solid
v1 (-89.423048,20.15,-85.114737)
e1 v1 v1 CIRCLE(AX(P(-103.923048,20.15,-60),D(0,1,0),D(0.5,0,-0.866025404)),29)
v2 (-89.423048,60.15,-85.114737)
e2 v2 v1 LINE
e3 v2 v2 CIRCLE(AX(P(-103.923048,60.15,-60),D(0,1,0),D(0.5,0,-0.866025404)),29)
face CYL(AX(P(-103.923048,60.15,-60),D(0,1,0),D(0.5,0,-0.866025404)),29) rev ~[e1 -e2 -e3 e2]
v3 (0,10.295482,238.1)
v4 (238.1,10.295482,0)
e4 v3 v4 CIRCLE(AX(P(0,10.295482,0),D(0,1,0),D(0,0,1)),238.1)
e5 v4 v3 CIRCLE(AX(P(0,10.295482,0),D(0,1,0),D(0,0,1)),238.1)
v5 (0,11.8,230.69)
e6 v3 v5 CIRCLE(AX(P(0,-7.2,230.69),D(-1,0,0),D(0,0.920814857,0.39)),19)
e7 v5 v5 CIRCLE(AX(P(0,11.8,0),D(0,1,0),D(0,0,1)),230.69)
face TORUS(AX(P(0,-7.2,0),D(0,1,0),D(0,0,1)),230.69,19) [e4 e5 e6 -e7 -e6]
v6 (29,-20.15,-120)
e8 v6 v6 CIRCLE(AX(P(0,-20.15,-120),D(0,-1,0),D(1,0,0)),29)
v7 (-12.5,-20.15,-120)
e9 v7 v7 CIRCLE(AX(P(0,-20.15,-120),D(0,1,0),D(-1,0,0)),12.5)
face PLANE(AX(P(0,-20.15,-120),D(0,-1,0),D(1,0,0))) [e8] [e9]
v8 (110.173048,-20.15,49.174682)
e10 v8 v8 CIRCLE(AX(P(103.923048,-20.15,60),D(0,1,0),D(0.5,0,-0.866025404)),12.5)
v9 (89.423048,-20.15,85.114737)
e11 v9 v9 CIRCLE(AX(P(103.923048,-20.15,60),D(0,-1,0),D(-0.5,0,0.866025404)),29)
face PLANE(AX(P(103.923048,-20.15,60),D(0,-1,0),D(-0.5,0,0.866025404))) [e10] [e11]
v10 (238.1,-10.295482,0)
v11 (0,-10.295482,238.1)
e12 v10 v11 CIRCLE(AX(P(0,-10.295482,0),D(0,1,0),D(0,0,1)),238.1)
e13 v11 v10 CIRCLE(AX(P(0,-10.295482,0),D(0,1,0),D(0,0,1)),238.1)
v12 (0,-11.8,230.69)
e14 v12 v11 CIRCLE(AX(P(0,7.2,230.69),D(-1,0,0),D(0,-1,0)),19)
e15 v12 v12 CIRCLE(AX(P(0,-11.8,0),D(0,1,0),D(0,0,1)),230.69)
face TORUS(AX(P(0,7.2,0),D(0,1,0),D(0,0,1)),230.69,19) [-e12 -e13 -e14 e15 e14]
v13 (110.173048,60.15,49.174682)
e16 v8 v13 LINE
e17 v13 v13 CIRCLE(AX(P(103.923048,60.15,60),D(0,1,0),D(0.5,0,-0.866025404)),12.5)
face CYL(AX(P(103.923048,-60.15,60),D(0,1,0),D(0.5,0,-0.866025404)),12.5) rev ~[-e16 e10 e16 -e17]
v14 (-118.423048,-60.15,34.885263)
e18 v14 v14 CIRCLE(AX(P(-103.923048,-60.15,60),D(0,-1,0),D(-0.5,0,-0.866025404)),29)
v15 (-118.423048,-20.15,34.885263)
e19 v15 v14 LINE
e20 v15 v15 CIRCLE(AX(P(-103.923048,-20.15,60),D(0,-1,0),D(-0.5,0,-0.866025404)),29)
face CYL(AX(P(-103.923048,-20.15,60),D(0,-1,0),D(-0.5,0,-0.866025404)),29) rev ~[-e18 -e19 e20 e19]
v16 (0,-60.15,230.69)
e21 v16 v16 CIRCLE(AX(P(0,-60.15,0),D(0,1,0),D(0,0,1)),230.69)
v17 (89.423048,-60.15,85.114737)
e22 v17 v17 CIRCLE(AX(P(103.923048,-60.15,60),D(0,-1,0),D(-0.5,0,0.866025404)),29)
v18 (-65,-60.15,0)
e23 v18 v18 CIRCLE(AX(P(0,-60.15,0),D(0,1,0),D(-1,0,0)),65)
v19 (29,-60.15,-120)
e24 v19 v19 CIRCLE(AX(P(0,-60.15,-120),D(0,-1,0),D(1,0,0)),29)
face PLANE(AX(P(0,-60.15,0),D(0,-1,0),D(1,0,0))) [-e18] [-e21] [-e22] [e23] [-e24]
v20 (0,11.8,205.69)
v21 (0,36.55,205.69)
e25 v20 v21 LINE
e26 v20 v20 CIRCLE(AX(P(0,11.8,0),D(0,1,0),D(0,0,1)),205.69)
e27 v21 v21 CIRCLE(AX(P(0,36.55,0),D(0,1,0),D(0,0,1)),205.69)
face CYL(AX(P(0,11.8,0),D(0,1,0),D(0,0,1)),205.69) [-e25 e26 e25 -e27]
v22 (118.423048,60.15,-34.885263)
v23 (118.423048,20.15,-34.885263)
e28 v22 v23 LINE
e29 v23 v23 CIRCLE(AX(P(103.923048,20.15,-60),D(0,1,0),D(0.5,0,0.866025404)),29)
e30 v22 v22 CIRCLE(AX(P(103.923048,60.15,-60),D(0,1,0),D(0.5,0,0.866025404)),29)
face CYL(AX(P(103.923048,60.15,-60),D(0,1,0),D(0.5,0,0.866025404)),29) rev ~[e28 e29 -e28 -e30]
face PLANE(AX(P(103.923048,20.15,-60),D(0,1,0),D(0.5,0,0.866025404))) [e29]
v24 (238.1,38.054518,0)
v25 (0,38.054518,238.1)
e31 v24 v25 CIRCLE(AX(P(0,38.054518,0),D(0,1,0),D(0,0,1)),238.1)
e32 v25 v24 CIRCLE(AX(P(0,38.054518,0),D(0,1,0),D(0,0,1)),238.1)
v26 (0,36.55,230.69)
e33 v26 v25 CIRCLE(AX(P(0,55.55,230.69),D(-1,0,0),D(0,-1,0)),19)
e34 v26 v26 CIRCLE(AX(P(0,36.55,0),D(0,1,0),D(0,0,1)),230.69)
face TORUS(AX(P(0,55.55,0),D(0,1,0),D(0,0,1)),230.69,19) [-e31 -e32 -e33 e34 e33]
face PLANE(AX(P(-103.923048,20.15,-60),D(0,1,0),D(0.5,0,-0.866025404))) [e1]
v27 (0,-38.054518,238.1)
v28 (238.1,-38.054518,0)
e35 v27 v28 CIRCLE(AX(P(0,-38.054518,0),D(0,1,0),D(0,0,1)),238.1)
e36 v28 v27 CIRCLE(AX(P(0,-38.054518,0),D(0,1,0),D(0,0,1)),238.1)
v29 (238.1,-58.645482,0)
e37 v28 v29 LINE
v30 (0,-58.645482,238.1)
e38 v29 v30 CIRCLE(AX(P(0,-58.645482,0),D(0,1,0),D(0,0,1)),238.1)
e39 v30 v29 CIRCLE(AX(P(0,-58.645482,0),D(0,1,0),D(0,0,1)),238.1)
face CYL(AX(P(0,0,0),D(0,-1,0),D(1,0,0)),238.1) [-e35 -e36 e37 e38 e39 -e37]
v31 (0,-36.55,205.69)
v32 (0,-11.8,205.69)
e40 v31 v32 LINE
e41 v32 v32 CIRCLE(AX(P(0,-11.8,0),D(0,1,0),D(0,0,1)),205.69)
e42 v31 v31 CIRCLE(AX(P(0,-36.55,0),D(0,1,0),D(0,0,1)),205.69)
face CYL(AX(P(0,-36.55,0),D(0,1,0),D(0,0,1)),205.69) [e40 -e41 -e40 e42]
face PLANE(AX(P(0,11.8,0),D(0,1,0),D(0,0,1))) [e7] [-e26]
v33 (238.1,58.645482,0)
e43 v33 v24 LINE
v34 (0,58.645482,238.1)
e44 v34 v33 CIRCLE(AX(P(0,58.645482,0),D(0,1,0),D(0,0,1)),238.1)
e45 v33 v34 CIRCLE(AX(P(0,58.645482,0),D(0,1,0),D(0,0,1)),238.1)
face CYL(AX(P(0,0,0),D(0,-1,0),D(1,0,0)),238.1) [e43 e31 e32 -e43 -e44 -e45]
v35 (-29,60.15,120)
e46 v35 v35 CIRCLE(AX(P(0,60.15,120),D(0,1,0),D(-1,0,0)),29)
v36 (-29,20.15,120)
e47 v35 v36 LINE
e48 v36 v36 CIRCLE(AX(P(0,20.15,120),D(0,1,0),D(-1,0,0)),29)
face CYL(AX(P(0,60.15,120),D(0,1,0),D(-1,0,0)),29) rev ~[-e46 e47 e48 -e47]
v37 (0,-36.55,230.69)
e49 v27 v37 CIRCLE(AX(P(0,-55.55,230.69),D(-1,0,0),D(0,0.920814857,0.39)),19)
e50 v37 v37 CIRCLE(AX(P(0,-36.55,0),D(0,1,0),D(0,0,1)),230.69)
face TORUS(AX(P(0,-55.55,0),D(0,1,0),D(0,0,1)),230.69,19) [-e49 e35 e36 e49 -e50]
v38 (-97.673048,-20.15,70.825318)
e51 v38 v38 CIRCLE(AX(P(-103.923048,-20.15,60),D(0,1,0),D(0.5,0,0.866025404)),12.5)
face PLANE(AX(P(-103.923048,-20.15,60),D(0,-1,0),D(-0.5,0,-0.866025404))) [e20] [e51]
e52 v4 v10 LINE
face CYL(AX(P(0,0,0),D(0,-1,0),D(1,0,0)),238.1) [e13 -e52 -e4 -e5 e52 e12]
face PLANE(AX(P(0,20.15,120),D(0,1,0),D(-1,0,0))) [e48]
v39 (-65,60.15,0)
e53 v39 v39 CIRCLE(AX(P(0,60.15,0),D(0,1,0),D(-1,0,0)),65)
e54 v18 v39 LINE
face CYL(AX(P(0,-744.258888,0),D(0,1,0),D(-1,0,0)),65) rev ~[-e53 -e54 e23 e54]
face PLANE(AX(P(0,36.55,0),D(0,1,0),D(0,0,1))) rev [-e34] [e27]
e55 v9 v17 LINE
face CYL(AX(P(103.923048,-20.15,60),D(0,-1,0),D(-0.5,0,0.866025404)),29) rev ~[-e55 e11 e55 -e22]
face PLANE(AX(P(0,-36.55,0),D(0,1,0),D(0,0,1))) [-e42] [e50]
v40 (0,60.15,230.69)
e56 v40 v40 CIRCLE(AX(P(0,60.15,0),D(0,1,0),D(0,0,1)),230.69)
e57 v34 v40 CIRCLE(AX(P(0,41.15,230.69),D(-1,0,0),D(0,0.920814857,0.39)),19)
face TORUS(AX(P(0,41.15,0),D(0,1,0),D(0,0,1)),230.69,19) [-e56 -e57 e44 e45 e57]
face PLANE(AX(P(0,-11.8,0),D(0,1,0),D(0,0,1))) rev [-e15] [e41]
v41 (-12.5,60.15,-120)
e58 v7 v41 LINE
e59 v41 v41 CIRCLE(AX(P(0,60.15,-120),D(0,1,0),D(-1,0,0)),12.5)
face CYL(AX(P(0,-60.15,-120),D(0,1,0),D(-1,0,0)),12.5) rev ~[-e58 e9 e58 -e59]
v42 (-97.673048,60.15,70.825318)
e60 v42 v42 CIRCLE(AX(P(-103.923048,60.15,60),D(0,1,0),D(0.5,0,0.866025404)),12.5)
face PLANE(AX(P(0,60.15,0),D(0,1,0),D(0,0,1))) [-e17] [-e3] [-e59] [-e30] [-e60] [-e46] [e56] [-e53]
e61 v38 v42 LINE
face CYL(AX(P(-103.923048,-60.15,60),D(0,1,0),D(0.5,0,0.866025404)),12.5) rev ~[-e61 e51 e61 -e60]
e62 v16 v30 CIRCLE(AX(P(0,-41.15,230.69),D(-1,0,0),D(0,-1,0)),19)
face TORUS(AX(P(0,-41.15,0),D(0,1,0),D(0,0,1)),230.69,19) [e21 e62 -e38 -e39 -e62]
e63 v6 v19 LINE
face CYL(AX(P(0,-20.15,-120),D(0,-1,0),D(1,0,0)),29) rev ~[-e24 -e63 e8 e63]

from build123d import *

# Parameters (mm, degrees)
F0_R            = 238.1
F1_DEPTH        = 60.15
F1_DEPTH_BACK   = 60.15
F3_D            = 130
F5_D            = 25
F5_CBORE_D      = 58
F5_CBORE_DEPTH  = 40
F5_COPIES_COUNT = 3
F6_R            = 29
F7_DEPTH        = 40
F7_COPIES_COUNT = 3


# Not quite as in the source:
# - a pattern or mirror of a feature is missing from the dataset's text; its kind, count and spacing are read off the source's solid
# - a feature names something its author has since deleted; it is built from what else it names


with BuildPart() as f1:
    # F0 (on Front) → F1 (new body, two sides)
    with BuildSketch(Plane.XZ) as f1_sk:
        Circle(F0_R)
    extrude(amount=F1_DEPTH)
    extrude(f1_sk.sketch, amount=-F1_DEPTH_BACK)

    # F3 (through all)
    with Locations(Plane.XZ.offset(60.15)):
        with Locations((0, 0)):
            Hole(F3_D / 2)

    # F5 (through all)
    with Locations(Plane.XZ.offset(60.15)):
        with Locations((0, -120)):
            f5 = CounterBoreHole(F5_D / 2, F5_CBORE_D / 2, F5_CBORE_DEPTH)

    # F5_copies: F5 ×3 about axis
    f5_copies_axis = Axis((0, 0, 0), (0, 1, 0))
    for i in range(1, F5_COPIES_COUNT):
        add(f5.rotate(f5_copies_axis, i * 360 / F5_COPIES_COUNT), mode=Mode.SUBTRACT)

    # F6 (on face) → F7 (cut)
    with BuildSketch(Plane(origin=(0, 60.15, 0), x_dir=(-1, 0, 0), z_dir=(0, 1, 0))):
        with Locations((0, 120)):
            Circle(F6_R)
    f7 = extrude(amount=-F7_DEPTH, mode=Mode.SUBTRACT)

    # F7_copies: F7 ×3 about axis
    f7_copies_axis = Axis((0, 0, 0), (0, 1, 0))
    for i in range(1, F7_COPIES_COUNT):
        add(f7.rotate(f7_copies_axis, i * 360 / F7_COPIES_COUNT), mode=Mode.SUBTRACT)

    # F8 (on Right) → F9 (revolve, cut)
    with BuildSketch(Plane.YZ):
        with BuildLine():
            Line((-36.55, 205.69), (-11.8, 205.69))
            Line((-11.8, 205.69), (-11.8, 230.69))
            ThreePointArc((-11.8, 230.69), (-11.4200720085, 234.4705976243), (-10.295482274, 238.1))
            Line((-10.295482274, 238.1), (10.295482274, 238.1))
            ThreePointArc((10.295482274, 238.1), (11.4200720085, 234.4705976243), (11.8, 230.69))
            Line((11.8, 230.69), (11.8, 205.69))
            Line((11.8, 205.69), (36.55, 205.69))
            Line((36.55, 205.69), (36.55, 230.69))
            ThreePointArc((36.55, 230.69), (36.9299279915, 234.4705976243), (38.054517726, 238.1))
            Line((38.054517726, 238.1), (58.645482274, 238.1))
            ThreePointArc((58.645482274, 238.1), (59.7700720085, 234.4705976243), (60.15, 230.69))
            Line((60.15, 230.69), (60.15, 223.28))
            Line((60.15, 223.28), (86.0586377919, 223.28))
            Line((86.0586377919, 223.28), (86.0586377919, 283.6410403252))
            Line((86.0586377919, 283.6410403252), (-71.6444390953, 283.6410403252))
            Line((-71.6444390953, 283.6410403252), (-71.6444390953, 224.8791903257))
            Line((-71.6444390953, 224.8791903257), (-60.15, 224.8791903257))
            Line((-60.15, 224.8791903257), (-60.15, 230.69))
            ThreePointArc((-60.15, 230.69), (-59.7700720085, 234.4705976243), (-58.645482274, 238.1))
            Line((-58.645482274, 238.1), (-38.054517726, 238.1))
            ThreePointArc((-38.054517726, 238.1), (-36.9299279915, 234.4705976243), (-36.55, 230.69))
            Line((-36.55, 230.69), (-36.55, 205.69))
        make_face()
    revolve(axis=Axis((0, 0, 0), (0, 1, 0)), mode=Mode.SUBTRACT)


solid = f1.part
